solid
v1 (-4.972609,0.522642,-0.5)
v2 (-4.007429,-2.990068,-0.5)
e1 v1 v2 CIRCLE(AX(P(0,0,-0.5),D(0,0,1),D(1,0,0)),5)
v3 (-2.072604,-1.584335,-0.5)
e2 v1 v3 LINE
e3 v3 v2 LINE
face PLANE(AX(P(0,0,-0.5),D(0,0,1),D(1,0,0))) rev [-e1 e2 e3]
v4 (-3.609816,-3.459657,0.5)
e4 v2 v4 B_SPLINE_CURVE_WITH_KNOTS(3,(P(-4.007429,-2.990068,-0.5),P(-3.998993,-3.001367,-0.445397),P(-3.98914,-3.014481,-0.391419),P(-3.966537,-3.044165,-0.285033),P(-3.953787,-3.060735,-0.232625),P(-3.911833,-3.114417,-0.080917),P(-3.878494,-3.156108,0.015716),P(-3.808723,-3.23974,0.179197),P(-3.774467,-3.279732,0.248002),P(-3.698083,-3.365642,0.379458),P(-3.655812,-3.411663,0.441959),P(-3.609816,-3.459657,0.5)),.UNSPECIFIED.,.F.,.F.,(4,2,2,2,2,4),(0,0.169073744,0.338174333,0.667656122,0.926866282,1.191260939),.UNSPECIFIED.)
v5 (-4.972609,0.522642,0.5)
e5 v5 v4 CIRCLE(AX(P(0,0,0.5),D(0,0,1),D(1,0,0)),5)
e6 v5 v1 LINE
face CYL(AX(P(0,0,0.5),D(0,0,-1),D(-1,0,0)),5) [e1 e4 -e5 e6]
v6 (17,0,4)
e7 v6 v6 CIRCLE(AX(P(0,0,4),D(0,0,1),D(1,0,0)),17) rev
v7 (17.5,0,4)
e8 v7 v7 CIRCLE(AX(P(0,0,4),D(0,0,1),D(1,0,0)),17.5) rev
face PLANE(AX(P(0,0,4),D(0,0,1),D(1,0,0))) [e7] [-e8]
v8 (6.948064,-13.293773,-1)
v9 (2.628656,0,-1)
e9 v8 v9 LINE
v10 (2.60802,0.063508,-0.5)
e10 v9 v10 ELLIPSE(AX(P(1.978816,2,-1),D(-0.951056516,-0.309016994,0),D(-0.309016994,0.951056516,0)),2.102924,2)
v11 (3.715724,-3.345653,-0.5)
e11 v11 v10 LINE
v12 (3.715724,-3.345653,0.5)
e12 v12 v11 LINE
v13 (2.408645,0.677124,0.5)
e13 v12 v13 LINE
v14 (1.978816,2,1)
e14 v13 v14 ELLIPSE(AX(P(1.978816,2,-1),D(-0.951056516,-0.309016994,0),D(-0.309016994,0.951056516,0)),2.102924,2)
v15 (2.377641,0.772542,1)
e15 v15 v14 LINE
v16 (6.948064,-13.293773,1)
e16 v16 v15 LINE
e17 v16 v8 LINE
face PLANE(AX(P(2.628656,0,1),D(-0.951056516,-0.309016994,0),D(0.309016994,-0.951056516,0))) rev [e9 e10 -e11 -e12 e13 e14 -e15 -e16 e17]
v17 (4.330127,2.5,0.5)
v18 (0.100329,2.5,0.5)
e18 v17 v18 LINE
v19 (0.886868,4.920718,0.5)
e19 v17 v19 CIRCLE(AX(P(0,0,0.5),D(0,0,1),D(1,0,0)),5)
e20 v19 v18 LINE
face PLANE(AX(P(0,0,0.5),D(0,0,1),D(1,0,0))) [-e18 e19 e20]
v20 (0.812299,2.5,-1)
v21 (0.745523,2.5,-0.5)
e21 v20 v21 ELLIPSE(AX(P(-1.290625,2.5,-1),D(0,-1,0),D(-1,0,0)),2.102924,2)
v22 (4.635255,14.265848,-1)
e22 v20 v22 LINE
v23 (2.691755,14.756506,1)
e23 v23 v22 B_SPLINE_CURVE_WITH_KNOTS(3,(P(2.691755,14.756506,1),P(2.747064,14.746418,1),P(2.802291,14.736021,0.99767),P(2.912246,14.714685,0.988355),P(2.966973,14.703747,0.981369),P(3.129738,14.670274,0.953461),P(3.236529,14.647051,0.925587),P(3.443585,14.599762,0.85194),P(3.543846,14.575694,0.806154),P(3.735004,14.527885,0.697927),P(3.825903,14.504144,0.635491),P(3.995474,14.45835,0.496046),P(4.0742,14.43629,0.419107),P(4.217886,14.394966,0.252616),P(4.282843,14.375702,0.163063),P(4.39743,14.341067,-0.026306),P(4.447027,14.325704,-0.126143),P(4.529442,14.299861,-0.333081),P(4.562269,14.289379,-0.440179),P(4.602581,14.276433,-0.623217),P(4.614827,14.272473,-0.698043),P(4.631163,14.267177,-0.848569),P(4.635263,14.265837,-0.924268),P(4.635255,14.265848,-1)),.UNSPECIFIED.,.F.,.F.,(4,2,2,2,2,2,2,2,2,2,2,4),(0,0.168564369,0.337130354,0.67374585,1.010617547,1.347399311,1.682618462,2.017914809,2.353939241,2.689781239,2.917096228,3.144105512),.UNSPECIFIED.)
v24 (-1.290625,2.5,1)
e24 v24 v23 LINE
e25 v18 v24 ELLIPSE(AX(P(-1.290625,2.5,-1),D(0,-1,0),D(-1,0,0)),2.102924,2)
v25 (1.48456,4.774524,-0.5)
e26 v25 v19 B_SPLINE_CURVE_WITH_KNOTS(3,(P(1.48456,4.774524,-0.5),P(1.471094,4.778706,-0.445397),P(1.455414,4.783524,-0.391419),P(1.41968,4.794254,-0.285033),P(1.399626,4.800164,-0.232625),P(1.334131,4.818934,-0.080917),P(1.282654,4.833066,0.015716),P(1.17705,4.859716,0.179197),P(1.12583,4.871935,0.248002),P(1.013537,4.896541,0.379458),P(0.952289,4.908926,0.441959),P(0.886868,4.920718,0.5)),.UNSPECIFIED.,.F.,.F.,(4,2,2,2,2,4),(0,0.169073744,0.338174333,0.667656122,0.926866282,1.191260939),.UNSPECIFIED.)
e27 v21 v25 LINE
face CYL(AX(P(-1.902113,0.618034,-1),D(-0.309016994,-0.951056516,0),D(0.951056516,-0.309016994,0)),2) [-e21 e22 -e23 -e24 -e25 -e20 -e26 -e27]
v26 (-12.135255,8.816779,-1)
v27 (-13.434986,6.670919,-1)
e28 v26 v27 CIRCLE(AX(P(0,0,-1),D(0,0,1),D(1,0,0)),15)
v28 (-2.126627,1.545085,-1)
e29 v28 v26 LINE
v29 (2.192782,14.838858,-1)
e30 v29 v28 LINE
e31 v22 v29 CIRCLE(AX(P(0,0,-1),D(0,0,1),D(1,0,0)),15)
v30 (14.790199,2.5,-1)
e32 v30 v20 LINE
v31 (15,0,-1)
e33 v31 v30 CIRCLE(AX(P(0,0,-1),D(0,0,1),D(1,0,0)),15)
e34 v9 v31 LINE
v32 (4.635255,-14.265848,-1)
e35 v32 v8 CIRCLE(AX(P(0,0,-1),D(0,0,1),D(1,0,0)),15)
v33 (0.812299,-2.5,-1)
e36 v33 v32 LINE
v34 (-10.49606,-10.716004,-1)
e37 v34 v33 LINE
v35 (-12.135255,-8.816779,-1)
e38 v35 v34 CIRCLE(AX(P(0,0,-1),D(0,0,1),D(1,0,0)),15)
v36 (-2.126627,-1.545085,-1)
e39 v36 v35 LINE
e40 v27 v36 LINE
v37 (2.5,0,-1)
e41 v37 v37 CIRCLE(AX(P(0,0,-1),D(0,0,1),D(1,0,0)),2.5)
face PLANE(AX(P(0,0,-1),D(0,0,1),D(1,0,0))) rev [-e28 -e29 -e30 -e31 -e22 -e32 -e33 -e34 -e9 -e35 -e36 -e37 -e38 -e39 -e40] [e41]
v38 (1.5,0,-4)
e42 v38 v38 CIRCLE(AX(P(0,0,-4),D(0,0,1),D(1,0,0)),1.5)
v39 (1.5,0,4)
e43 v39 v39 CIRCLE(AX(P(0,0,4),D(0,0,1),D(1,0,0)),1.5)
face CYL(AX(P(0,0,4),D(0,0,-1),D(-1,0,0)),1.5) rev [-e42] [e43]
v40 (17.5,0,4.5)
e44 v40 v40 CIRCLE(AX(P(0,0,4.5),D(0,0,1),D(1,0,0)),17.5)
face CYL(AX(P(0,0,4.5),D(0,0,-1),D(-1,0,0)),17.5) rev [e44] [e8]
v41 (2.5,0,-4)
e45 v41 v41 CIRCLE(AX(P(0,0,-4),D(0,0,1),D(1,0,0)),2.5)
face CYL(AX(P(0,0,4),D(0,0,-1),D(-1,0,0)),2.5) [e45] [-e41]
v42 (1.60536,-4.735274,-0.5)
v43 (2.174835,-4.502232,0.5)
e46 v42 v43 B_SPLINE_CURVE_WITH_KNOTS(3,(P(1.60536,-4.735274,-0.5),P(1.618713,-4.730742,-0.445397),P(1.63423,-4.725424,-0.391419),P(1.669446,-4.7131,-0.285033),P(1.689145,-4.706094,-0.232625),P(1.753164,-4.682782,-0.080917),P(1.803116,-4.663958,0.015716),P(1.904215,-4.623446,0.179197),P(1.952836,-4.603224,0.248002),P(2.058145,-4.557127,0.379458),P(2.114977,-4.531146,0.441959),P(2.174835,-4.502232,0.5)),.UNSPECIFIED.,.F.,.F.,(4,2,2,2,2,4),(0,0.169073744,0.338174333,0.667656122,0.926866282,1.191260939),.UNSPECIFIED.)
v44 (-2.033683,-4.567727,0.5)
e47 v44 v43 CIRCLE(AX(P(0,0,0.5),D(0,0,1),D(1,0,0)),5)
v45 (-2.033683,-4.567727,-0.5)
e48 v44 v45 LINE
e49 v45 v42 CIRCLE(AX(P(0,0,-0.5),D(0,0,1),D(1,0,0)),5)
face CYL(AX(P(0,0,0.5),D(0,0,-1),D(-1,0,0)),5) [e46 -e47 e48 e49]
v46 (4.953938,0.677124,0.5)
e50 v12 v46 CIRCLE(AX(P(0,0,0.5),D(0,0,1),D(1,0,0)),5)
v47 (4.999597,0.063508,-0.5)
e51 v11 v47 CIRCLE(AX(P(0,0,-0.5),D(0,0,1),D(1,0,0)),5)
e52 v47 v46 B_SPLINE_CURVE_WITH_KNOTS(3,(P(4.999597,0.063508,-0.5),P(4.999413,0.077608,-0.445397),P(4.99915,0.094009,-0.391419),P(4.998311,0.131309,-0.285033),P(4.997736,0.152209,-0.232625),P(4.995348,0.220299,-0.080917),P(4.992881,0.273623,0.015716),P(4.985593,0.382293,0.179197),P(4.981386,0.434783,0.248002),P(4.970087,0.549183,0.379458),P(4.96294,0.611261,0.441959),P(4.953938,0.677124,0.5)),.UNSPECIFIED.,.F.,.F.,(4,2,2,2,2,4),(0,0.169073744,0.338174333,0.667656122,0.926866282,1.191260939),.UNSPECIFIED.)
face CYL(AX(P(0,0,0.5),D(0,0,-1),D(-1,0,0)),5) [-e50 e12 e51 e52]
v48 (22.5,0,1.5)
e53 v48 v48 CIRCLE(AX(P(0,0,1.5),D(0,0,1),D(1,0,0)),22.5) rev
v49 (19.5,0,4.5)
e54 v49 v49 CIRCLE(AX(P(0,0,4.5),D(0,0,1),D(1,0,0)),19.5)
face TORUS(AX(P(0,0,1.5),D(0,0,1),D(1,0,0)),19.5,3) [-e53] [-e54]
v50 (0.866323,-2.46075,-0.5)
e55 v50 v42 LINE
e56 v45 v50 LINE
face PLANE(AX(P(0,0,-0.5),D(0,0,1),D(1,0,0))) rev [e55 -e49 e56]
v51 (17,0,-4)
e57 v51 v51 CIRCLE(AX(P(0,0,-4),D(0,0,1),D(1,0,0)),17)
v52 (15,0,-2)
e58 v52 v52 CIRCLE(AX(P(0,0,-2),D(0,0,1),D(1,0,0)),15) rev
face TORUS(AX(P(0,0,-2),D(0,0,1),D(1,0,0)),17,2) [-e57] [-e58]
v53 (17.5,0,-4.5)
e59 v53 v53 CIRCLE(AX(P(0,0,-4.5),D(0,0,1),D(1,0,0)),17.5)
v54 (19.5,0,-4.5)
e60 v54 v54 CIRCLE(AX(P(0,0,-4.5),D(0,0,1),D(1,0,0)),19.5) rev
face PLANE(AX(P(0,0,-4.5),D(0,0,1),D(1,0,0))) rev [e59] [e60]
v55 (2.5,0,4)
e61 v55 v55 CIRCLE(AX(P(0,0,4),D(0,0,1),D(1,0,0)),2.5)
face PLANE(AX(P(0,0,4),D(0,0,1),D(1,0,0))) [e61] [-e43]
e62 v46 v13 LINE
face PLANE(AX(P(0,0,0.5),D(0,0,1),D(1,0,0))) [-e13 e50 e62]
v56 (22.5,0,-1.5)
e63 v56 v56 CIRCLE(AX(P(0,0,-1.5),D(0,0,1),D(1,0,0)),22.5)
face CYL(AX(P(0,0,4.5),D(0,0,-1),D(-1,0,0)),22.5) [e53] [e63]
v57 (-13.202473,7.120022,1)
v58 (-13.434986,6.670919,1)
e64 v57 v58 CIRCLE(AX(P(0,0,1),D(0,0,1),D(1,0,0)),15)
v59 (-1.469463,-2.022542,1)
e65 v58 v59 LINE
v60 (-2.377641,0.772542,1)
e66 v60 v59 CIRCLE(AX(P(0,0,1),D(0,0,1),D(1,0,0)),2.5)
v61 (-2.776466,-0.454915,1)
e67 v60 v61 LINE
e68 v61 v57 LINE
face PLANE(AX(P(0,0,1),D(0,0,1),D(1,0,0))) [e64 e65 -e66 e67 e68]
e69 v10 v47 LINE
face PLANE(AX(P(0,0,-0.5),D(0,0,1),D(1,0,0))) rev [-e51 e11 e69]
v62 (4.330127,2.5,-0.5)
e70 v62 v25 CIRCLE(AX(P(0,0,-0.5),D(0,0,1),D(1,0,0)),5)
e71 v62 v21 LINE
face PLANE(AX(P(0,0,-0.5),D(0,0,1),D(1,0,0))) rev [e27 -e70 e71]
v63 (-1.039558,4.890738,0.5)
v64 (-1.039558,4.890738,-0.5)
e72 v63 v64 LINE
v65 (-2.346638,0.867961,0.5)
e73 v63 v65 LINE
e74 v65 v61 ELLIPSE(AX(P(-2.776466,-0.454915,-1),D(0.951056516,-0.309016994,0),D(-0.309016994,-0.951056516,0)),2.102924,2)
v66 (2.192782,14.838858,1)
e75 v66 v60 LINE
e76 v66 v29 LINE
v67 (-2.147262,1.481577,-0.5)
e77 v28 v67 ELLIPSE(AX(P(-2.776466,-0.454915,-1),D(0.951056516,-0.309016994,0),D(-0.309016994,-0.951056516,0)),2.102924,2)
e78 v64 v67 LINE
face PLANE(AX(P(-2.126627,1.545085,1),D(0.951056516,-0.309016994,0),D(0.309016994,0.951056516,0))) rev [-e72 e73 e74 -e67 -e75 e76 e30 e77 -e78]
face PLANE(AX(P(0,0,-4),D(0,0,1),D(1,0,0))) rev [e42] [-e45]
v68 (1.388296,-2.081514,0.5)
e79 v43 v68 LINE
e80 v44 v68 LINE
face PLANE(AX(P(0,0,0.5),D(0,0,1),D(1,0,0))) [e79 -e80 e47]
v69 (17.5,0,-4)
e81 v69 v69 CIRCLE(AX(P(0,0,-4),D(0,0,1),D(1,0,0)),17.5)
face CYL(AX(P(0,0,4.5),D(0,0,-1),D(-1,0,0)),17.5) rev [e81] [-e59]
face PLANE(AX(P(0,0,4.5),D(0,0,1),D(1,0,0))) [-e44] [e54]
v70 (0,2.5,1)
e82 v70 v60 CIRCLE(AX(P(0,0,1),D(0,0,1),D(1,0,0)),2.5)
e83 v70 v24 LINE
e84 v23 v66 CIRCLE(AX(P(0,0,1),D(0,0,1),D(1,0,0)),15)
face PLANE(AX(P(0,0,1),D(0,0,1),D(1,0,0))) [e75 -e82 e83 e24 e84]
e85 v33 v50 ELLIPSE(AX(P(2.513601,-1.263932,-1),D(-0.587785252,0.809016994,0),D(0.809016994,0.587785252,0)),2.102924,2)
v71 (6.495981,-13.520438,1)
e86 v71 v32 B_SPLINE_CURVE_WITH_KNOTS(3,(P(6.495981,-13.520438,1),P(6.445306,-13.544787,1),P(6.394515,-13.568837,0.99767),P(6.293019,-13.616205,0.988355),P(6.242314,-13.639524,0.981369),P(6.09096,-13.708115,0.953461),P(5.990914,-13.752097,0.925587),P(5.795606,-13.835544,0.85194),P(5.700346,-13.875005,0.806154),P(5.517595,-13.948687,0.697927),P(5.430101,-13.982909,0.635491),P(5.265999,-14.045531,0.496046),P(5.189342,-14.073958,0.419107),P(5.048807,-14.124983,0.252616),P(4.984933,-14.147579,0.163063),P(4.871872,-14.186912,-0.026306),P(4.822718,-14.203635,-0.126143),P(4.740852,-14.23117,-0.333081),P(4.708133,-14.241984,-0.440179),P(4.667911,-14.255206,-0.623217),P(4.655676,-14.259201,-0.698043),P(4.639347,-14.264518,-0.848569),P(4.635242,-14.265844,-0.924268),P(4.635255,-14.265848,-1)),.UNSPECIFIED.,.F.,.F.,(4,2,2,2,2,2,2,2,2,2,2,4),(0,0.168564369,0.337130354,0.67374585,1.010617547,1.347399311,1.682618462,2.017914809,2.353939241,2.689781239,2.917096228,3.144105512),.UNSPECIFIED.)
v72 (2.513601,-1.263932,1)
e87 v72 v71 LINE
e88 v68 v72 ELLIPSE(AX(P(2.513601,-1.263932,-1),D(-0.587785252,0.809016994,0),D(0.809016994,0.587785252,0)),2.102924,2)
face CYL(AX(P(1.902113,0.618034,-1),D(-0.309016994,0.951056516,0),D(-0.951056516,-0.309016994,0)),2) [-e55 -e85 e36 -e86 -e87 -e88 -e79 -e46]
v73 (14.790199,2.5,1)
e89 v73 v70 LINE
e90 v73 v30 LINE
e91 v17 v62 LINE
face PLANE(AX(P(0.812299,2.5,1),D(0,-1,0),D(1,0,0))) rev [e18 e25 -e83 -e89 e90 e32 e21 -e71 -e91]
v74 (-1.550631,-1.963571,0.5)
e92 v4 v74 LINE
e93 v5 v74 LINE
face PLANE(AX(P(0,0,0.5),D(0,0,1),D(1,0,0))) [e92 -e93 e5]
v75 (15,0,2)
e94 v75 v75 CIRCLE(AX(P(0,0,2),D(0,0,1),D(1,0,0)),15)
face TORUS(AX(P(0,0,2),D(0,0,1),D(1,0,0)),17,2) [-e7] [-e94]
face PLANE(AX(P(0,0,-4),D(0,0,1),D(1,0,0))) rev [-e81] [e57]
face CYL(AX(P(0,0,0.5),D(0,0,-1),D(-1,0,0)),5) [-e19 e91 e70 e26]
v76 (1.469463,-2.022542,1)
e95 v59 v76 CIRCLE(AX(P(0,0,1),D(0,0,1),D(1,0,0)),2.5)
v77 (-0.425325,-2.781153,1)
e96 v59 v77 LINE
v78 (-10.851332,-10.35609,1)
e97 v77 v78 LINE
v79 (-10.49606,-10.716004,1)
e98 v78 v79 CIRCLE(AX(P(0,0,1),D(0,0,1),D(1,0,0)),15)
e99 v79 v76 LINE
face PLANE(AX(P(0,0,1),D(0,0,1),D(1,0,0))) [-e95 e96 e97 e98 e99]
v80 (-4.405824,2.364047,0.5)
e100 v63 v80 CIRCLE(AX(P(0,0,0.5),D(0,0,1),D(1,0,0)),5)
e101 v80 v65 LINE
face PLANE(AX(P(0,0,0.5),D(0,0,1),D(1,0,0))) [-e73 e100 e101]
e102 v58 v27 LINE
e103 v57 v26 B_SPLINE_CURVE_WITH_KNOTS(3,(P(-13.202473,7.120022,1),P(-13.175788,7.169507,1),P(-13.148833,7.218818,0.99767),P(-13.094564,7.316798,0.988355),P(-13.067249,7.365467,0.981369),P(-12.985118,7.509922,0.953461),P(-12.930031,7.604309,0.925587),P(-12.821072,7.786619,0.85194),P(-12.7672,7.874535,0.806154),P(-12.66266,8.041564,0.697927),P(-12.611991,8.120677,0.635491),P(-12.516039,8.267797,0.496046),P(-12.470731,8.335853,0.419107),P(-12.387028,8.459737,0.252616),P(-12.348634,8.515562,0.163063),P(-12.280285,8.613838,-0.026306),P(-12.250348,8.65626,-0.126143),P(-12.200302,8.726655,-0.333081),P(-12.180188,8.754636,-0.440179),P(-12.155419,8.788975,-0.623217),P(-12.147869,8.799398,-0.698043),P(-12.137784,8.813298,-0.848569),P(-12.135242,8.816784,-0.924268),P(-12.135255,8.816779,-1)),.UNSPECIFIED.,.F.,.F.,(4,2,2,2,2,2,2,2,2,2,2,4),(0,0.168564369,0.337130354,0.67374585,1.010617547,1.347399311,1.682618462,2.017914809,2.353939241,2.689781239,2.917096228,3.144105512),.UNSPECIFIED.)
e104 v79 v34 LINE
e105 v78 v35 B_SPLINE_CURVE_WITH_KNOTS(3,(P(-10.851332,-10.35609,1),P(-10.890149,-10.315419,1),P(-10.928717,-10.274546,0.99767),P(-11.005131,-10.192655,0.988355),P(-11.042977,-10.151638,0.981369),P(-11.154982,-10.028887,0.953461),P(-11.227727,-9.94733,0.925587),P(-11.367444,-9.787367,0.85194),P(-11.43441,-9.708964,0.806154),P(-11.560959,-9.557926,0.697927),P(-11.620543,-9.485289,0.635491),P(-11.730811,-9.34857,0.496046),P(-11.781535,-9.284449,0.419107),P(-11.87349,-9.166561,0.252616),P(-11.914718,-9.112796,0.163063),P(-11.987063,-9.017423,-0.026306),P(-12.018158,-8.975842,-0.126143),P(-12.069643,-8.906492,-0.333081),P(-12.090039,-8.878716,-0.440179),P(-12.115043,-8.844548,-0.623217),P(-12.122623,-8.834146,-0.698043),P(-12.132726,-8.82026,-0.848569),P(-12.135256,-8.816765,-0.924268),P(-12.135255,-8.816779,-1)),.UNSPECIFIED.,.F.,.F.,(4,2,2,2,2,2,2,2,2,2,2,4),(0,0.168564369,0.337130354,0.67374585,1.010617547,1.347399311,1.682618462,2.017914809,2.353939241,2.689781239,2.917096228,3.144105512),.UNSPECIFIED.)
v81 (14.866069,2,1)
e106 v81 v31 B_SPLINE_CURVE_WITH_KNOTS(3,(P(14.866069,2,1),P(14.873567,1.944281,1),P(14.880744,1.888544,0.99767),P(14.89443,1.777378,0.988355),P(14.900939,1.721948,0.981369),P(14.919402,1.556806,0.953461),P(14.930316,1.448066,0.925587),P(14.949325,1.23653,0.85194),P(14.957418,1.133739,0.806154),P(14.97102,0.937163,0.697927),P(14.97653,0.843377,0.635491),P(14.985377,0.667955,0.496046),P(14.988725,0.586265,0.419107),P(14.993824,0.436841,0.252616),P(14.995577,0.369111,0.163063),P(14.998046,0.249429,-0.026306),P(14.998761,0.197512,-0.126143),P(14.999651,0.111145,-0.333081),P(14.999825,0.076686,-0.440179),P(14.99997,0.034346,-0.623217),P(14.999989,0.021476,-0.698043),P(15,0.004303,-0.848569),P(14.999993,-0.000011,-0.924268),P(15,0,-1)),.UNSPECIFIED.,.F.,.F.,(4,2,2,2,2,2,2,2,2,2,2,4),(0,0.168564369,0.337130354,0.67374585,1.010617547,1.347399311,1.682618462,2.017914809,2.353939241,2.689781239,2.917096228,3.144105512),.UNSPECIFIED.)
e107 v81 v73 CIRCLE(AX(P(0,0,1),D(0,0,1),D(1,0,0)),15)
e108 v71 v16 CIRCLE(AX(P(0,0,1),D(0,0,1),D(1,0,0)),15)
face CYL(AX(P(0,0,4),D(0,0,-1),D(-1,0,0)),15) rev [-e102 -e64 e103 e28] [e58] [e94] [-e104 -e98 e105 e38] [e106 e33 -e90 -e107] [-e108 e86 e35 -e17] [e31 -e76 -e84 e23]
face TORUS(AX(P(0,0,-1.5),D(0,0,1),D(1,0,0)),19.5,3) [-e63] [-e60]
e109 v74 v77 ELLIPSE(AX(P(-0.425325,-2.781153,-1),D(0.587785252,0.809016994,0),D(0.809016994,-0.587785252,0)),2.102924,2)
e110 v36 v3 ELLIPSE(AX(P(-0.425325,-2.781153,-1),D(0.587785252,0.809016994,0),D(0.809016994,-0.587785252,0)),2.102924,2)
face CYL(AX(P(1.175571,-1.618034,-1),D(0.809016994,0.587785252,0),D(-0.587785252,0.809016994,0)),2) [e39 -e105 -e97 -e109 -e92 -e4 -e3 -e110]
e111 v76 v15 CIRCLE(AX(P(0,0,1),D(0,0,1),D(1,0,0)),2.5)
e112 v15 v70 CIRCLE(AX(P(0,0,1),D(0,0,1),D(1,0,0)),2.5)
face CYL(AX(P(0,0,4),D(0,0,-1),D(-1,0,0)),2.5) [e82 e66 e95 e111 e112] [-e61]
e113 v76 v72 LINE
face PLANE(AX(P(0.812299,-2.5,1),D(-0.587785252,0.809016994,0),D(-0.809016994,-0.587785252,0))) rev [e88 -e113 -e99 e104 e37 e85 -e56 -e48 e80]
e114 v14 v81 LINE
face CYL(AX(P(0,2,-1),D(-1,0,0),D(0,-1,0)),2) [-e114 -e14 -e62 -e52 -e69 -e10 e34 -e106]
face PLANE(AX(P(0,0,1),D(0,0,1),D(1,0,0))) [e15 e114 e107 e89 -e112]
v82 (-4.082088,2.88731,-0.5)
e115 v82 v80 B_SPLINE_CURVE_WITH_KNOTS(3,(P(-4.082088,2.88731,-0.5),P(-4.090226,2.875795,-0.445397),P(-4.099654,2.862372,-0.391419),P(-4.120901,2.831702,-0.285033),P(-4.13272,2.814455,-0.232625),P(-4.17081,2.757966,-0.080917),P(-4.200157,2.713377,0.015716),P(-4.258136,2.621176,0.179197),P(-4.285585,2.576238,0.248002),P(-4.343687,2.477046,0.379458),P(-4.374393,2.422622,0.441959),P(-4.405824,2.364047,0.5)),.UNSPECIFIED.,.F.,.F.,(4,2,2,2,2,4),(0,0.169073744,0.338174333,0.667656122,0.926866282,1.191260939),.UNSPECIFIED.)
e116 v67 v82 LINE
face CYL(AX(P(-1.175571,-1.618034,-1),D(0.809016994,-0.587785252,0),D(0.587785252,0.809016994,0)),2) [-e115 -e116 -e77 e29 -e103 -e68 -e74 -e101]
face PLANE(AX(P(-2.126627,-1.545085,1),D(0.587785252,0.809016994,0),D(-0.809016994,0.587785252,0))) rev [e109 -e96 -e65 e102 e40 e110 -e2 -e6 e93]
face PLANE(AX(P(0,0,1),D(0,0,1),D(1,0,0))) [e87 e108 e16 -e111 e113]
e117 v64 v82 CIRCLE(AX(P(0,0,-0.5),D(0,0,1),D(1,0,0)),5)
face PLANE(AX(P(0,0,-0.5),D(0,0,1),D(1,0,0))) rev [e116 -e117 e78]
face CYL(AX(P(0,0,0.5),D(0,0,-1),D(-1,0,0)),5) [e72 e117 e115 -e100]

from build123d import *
from build123d.topology import SkipClean

# Parameters (mm, degrees)
SKETCH2_R           = 2.5
SKETCH2_R_2         = 1.5
BOSS_EXTRUDE1_DEPTH = 4
SKETCH3_R           = 17.5
SKETCH3_R_2         = 15
BOSS_EXTRUDE2_DEPTH = 4
SKETCH4_R           = 2.5
BOSS_EXTRUDE3_DEPTH = 1
SKETCH5_R           = 5
SKETCH5_R_2         = 2.5
BOSS_EXTRUDE4_DEPTH = 0.5
FILLET1_R           = 2
FILLET2_R           = 2
SKETCH6_R           = 22.5
SKETCH6_R_2         = 17.5
BOSS_EXTRUDE5_DEPTH = 4.5
FILLET3_R           = 3


with BuildPart() as part:
    # Sketch2 → Boss-Extrude1 (new, symmetric)
    with BuildSketch(Plane.XY):
        Circle(SKETCH2_R)
        Circle(SKETCH2_R_2, mode=Mode.SUBTRACT)
    extrude(amount=BOSS_EXTRUDE1_DEPTH, both=True)



with BuildPart() as body_2:
    # Sketch3 → Boss-Extrude2 (new, symmetric)
    with BuildSketch(Plane.XY):
        Circle(SKETCH3_R)
        Circle(SKETCH3_R_2, mode=Mode.SUBTRACT)
    extrude(amount=BOSS_EXTRUDE2_DEPTH, both=True)


with BuildPart() as part_1:
    add(part.part)

    add(body_2.part)  # Boss-Extrude3 merges body 2
    # Sketch4 → Boss-Extrude3 (add, symmetric)
    with BuildSketch(Plane.XY):
        with BuildLine():
            Line((0.812299241, 2.5), (14.790199458, 2.5))
            ThreePointArc((14.790199458, 2.5), (14.947457842, 1.254393904), (15, 0))
            Line((15, 0), (2.628655561, 0))
            Line((2.628655561, 0), (6.948064273, -13.293773086))
            ThreePointArc((6.948064273, -13.293773086), (5.812017992, -13.828248148), (4.635254916, -14.265847744))
            Line((4.635254916, -14.265847744), (0.812299241, -2.5))
            Line((0.812299241, -2.5), (-10.496059581, -10.716003606))
            ThreePointArc((-10.496059581, -10.716003606), (-11.355433179, -9.800721265), (-12.135254916, -8.816778784))
            Line((-12.135254916, -8.816778784), (-2.126627021, -1.545084972))
            Line((-2.126627021, -1.545084972), (-13.434985842, 6.670918634))
            ThreePointArc((-13.434985842, 6.670918634), (-12.830061654, 7.771069293), (-12.135254916, 8.816778784))
            Line((-12.135254916, 8.816778784), (-2.126627021, 1.545084972))
            Line((-2.126627021, 1.545084972), (2.192781692, 14.838858058))
            ThreePointArc((2.192781692, 14.838858058), (3.426018999, 14.603506217), (4.635254916, 14.265847744))
            Line((4.635254916, 14.265847744), (0.812299241, 2.5))
        make_face()
        Circle(SKETCH4_R, mode=Mode.SUBTRACT)
    extrude(amount=BOSS_EXTRUDE3_DEPTH, both=True)

    # Sketch5 → Boss-Extrude4 (add, symmetric)
    with BuildSketch(Plane.XY):
        Circle(SKETCH5_R)
        Circle(SKETCH5_R_2, mode=Mode.SUBTRACT)
    extrude(amount=BOSS_EXTRUDE4_DEPTH, both=True)

    # Fillet1
    fillet1_edges = [part_1.edges().sort_by_distance(p)[0] for p in [
        (-15, 0, 4),
        (-15, 0, -4),
    ]]
    fillet(fillet1_edges, radius=FILLET1_R)

    # Fillet2
    # the kernel refuses this fillet: 2 mm, written as the material it takes off along each edge
    with BuildSketch(Plane(origin=(-16.180339887, -11.755705046, 1), x_dir=(0.5877852522924676, -0.8090169943749516, 0), z_dir=(0.8090169943749516, 0.5877852522924676, 0))) as fillet2_piece_1_section:
        with BuildLine():
            CenterArc((FILLET2_R, FILLET2_R), FILLET2_R, 180, 90)
            Line((0, FILLET2_R), (0, 0))
            Line((0, 0), (FILLET2_R, 0))
        make_face()
    fillet2_piece_1 = extrude(amount=22.371344439, mode=Mode.PRIVATE)
    fillet2_piece_1 = fillet2_piece_1 & Plane(origin=(0, 0, 0.789788575), x_dir=(1, 0, 0), z_dir=(0, 0, -1)) * Cylinder(15, 53, mode=Mode.PRIVATE)
    fillet2_piece_1 = split(fillet2_piece_1, bisect_by=Plane(origin=(-3.505962459, -0.542939116, 0.789788575), z_dir=(-0.5877852522924808, -0.809016994374942, 0)), keep=Keep.TOP, mode=Mode.PRIVATE)
    fillet2_piece_1 = split(fillet2_piece_1, bisect_by=Plane(origin=(-7.715238997, -6.336511241, 0.5), z_dir=(0, 0, 1)), keep=Keep.TOP, mode=Mode.PRIVATE)
    add(fillet2_piece_1, mode=Mode.SUBTRACT)
    with BuildSketch(Plane(origin=(-16.180339887, -11.755705046, 1), x_dir=(0.5877852522924676, -0.8090169943749516, 0), z_dir=(0.8090169943749516, 0.5877852522924676, 0))) as fillet2_piece_2_section:
        with BuildLine():
            CenterArc((FILLET2_R, FILLET2_R), FILLET2_R, 180, 90)
            Line((0, FILLET2_R), (0, 0))
            Line((0, 0), (FILLET2_R, 0))
        make_face()
    fillet2_piece_2 = extrude(amount=22.371344439, mode=Mode.PRIVATE)
    fillet2_piece_2 = fillet2_piece_2 & Plane(origin=(0, 0, 0.165607545), x_dir=(1, 0, 0), z_dir=(0, 0, -1)) * Cylinder(15, 53, mode=Mode.PRIVATE)
    fillet2_piece_2 = fillet2_piece_2 - Plane(origin=(0, 0, 0.165607545), x_dir=(1, 0, 0), z_dir=(0, 0, 1)) * Cylinder(5, 53, mode=Mode.PRIVATE)
    add(fillet2_piece_2, mode=Mode.SUBTRACT)
    with BuildSketch(Plane(origin=(-16.180339887, -11.755705046, 1), x_dir=(0.5877852522924676, -0.8090169943749516, 0), z_dir=(0.8090169943749516, 0.5877852522924676, 0))) as fillet2_piece_3_section:
        with BuildLine():
            CenterArc((FILLET2_R, FILLET2_R), FILLET2_R, 180, 90)
            Line((0, FILLET2_R), (0, 0))
            Line((0, 0), (FILLET2_R, 0))
        make_face()
    fillet2_piece_3 = extrude(amount=22.371344439, mode=Mode.PRIVATE)
    fillet2_piece_3 = split(fillet2_piece_3, bisect_by=Plane(origin=(-2.407624437, -1.340928399, -0.624492786), z_dir=(-0.5877852522924808, -0.809016994374942, 0)), keep=Keep.TOP, mode=Mode.PRIVATE)
    fillet2_piece_3 = split(fillet2_piece_3, bisect_by=Plane(origin=(-3.07214741, -2.255565805, -0.5), z_dir=(0, 0, -1)), keep=Keep.TOP, mode=Mode.PRIVATE)
    fillet2_piece_3 = fillet2_piece_3 & Plane(origin=(0, 0, -0.624492786), x_dir=(1, 0, 0), z_dir=(0, 0, 1)) * Cylinder(5, 53, mode=Mode.PRIVATE)
    add(fillet2_piece_3, mode=Mode.SUBTRACT)
    with BuildSketch(Plane(origin=(-16.180339887, -11.755705046, 1), x_dir=(0.5877852522924676, -0.8090169943749516, 0), z_dir=(0.8090169943749516, 0.5877852522924676, 0))) as fillet2_piece_4_section:
        with BuildLine():
            CenterArc((FILLET2_R, FILLET2_R), FILLET2_R, 180, 90)
            Line((0, FILLET2_R), (0, 0))
            Line((0, 0), (FILLET2_R, 0))
        make_face()
    fillet2_piece_4 = extrude(amount=22.371344439, mode=Mode.PRIVATE)
    fillet2_piece_4 = split(fillet2_piece_4, bisect_by=Plane(origin=(2.517761199, 0.34129775, 0.915192328), z_dir=(0.9510565162951545, 0.3090169943749446, 0)), keep=Keep.TOP, mode=Mode.PRIVATE)
    add(fillet2_piece_4, mode=Mode.SUBTRACT)
    with BuildSketch(Plane(origin=(6.180339887, -19.021130326, 1), x_dir=(0.9510565162951548, 0.30901699437494423, 0), z_dir=(-0.3090169943749442, 0.9510565162951546, 0))) as fillet2_piece_5_section:
        with BuildLine():
            CenterArc((FILLET2_R, FILLET2_R), FILLET2_R, 180, 90)
            Line((0, FILLET2_R), (0, 0))
            Line((0, 0), (FILLET2_R, 0))
        make_face()
    fillet2_piece_5 = extrude(amount=22.371344439, mode=Mode.PRIVATE)
    fillet2_piece_5 = fillet2_piece_5 & Plane(origin=(0, 0, 0.789788575), x_dir=(1, 0, 0), z_dir=(0, 0, -1)) * Cylinder(15, 53, mode=Mode.PRIVATE)
    fillet2_piece_5 = split(fillet2_piece_5, bisect_by=Plane(origin=(-0.567036197, -3.502145856, 0.789788575), z_dir=(0.5877852522924683, -0.809016994374951, 0)), keep=Keep.TOP, mode=Mode.PRIVATE)
    fillet2_piece_5 = split(fillet2_piece_5, bisect_by=Plane(origin=(3.64224034, -9.29571798, 0.5), z_dir=(0, 0, 1)), keep=Keep.TOP, mode=Mode.PRIVATE)
    add(fillet2_piece_5, mode=Mode.SUBTRACT)
    with BuildSketch(Plane(origin=(6.180339887, -19.021130326, 1), x_dir=(0.9510565162951548, 0.30901699437494423, 0), z_dir=(-0.3090169943749442, 0.9510565162951546, 0))) as fillet2_piece_6_section:
        with BuildLine():
            CenterArc((FILLET2_R, FILLET2_R), FILLET2_R, 180, 90)
            Line((0, FILLET2_R), (0, 0))
            Line((0, 0), (FILLET2_R, 0))
        make_face()
    fillet2_piece_6 = extrude(amount=22.371344439, mode=Mode.PRIVATE)
    fillet2_piece_6 = fillet2_piece_6 & Plane(origin=(0, 0, 0.165607542), x_dir=(1, 0, 0), z_dir=(0, 0, -1)) * Cylinder(15, 53, mode=Mode.PRIVATE)
    fillet2_piece_6 = fillet2_piece_6 - Plane(origin=(0, 0, 0.165607542), x_dir=(1, 0, 0), z_dir=(0, 0, 1)) * Cylinder(5, 53, mode=Mode.PRIVATE)
    add(fillet2_piece_6, mode=Mode.SUBTRACT)
    with BuildSketch(Plane(origin=(6.180339887, -19.021130326, 1), x_dir=(0.9510565162951548, 0.30901699437494423, 0), z_dir=(-0.3090169943749442, 0.9510565162951546, 0))) as fillet2_piece_7_section:
        with BuildLine():
            CenterArc((FILLET2_R, FILLET2_R), FILLET2_R, 180, 90)
            Line((0, FILLET2_R), (0, 0))
            Line((0, 0), (FILLET2_R, 0))
        make_face()
    fillet2_piece_7 = extrude(amount=22.371344439, mode=Mode.PRIVATE)
    fillet2_piece_7 = split(fillet2_piece_7, bisect_by=Plane(origin=(0.531301828, -2.704156571, -0.624492787), z_dir=(0.5877852522924683, -0.809016994374951, 0)), keep=Keep.TOP, mode=Mode.PRIVATE)
    fillet2_piece_7 = split(fillet2_piece_7, bisect_by=Plane(origin=(1.195824797, -3.618793972, -0.5), z_dir=(0, 0, -1)), keep=Keep.TOP, mode=Mode.PRIVATE)
    fillet2_piece_7 = fillet2_piece_7 & Plane(origin=(0, 0, -0.624492787), x_dir=(1, 0, 0), z_dir=(0, 0, 1)) * Cylinder(5, 53, mode=Mode.PRIVATE)
    add(fillet2_piece_7, mode=Mode.SUBTRACT)
    with BuildSketch(Plane(origin=(6.180339887, -19.021130326, 1), x_dir=(0.9510565162951548, 0.30901699437494423, 0), z_dir=(-0.3090169943749442, 0.9510565162951546, 0))) as fillet2_piece_8_section:
        with BuildLine():
            CenterArc((FILLET2_R, FILLET2_R), FILLET2_R, 180, 90)
            Line((0, FILLET2_R), (0, 0))
            Line((0, 0), (FILLET2_R, 0))
        make_face()
    fillet2_piece_8 = extrude(amount=22.371344439, mode=Mode.PRIVATE)
    fillet2_piece_8 = split(fillet2_piece_8, bisect_by=Plane(origin=(0.453437549, 2.5, 0.915192328), z_dir=(0, 1, 0)), keep=Keep.TOP, mode=Mode.PRIVATE)
    add(fillet2_piece_8, mode=Mode.SUBTRACT)
    with BuildSketch(Plane(origin=(20, 0, 1), x_dir=(0, 1, 0), z_dir=(-1, 0, 0))) as fillet2_piece_9_section:
        with BuildLine():
            CenterArc((FILLET2_R, FILLET2_R), FILLET2_R, 180, 90)
            Line((0, FILLET2_R), (0, 0))
            Line((0, 0), (FILLET2_R, 0))
        make_face()
    fillet2_piece_9 = extrude(amount=22.371344439, mode=Mode.PRIVATE)
    fillet2_piece_9 = fillet2_piece_9 & Plane(origin=(0, 0, 0.789788574), x_dir=(1, 0, 0), z_dir=(0, 0, -1)) * Cylinder(15, 53, mode=Mode.PRIVATE)
    fillet2_piece_9 = split(fillet2_piece_9, bisect_by=Plane(origin=(3.155514809, -1.621506036, 0.789788574), z_dir=(0.9510565162951545, 0.3090169943749446, 0)), keep=Keep.TOP, mode=Mode.PRIVATE)
    fillet2_piece_9 = split(fillet2_piece_9, bisect_by=Plane(origin=(9.966267249, 0.591441577, 0.5), z_dir=(0, 0, 1)), keep=Keep.TOP, mode=Mode.PRIVATE)
    add(fillet2_piece_9, mode=Mode.SUBTRACT)
    with BuildSketch(Plane(origin=(20, 0, 1), x_dir=(0, 1, 0), z_dir=(-1, 0, 0))) as fillet2_piece_10_section:
        with BuildLine():
            CenterArc((FILLET2_R, FILLET2_R), FILLET2_R, 180, 90)
            Line((0, FILLET2_R), (0, 0))
            Line((0, 0), (FILLET2_R, 0))
        make_face()
    fillet2_piece_10 = extrude(amount=22.371344439, mode=Mode.PRIVATE)
    fillet2_piece_10 = fillet2_piece_10 & Plane(origin=(0, 0, 0.165607617), x_dir=(1, 0, 0), z_dir=(0, 0, -1)) * Cylinder(15, 53, mode=Mode.PRIVATE)
    fillet2_piece_10 = fillet2_piece_10 - Plane(origin=(0, 0, 0.165607617), x_dir=(1, 0, 0), z_dir=(0, 0, 1)) * Cylinder(5, 53, mode=Mode.PRIVATE)
    add(fillet2_piece_10, mode=Mode.SUBTRACT)
    with BuildSketch(Plane(origin=(20, 0, 1), x_dir=(0, 1, 0), z_dir=(-1, 0, 0))) as fillet2_piece_11_section:
        with BuildLine():
            CenterArc((FILLET2_R, FILLET2_R), FILLET2_R, 180, 90)
            Line((0, FILLET2_R), (0, 0))
            Line((0, 0), (FILLET2_R, 0))
        make_face()
    fillet2_piece_11 = extrude(amount=22.371344439, mode=Mode.PRIVATE)
    fillet2_piece_11 = split(fillet2_piece_11, bisect_by=Plane(origin=(2.735987023, -0.330332276, -0.624492792), z_dir=(0.9510565162951545, 0.3090169943749446, 0)), keep=Keep.TOP, mode=Mode.PRIVATE)
    fillet2_piece_11 = fillet2_piece_11 & Plane(origin=(0, 0, -0.624492792), x_dir=(1, 0, 0), z_dir=(0, 0, 1)) * Cylinder(5, 53, mode=Mode.PRIVATE)
    fillet2_piece_11 = split(fillet2_piece_11, bisect_by=Plane(origin=(3.811207779, 0.019028125, -0.5), z_dir=(0, 0, -1)), keep=Keep.TOP, mode=Mode.PRIVATE)
    add(fillet2_piece_11, mode=Mode.SUBTRACT)
    with BuildSketch(Plane(origin=(20, 0, 1), x_dir=(0, 1, 0), z_dir=(-1, 0, 0))) as fillet2_piece_12_section:
        with BuildLine():
            CenterArc((FILLET2_R, FILLET2_R), FILLET2_R, 180, 90)
            Line((0, FILLET2_R), (0, 0))
            Line((0, 0), (FILLET2_R, 0))
        make_face()
    fillet2_piece_12 = extrude(amount=22.371344439, mode=Mode.PRIVATE)
    fillet2_piece_12 = split(fillet2_piece_12, bisect_by=Plane(origin=(-2.237521382, 1.203787222, 0.915192328), z_dir=(-0.95105651629515, 0.30901699437495883, 0)), keep=Keep.TOP, mode=Mode.PRIVATE)
    add(fillet2_piece_12, mode=Mode.SUBTRACT)
    with BuildSketch(Plane(origin=(6.180339887, 19.021130326, 1), x_dir=(-0.9510565162951493, 0.3090169943749605, 0), z_dir=(-0.3090169943749605, -0.9510565162951493, 0))) as fillet2_piece_13_section:
        with BuildLine():
            CenterArc((FILLET2_R, FILLET2_R), FILLET2_R, 180, 90)
            Line((0, FILLET2_R), (0, 0))
            Line((0, 0), (FILLET2_R, 0))
        make_face()
    fillet2_piece_13 = extrude(amount=22.371344439, mode=Mode.PRIVATE)
    fillet2_piece_13 = fillet2_piece_13 & Plane(origin=(0, 0, 0.789788575), x_dir=(1, 0, 0), z_dir=(0, 0, -1)) * Cylinder(15, 53, mode=Mode.PRIVATE)
    fillet2_piece_13 = split(fillet2_piece_13, bisect_by=Plane(origin=(2.517251606, 2.5, 0.789788575), z_dir=(0, 1, 0)), keep=Keep.TOP, mode=Mode.PRIVATE)
    fillet2_piece_13 = split(fillet2_piece_13, bisect_by=Plane(origin=(2.517251606, 9.661248979, 0.5), z_dir=(0, 0, 1)), keep=Keep.TOP, mode=Mode.PRIVATE)
    add(fillet2_piece_13, mode=Mode.SUBTRACT)
    with BuildSketch(Plane(origin=(6.180339887, 19.021130326, 1), x_dir=(-0.9510565162951493, 0.3090169943749605, 0), z_dir=(-0.3090169943749605, -0.9510565162951493, 0))) as fillet2_piece_14_section:
        with BuildLine():
            CenterArc((FILLET2_R, FILLET2_R), FILLET2_R, 180, 90)
            Line((0, FILLET2_R), (0, 0))
            Line((0, 0), (FILLET2_R, 0))
        make_face()
    fillet2_piece_14 = extrude(amount=22.371344439, mode=Mode.PRIVATE)
    fillet2_piece_14 = fillet2_piece_14 & Plane(origin=(0, 0, 0.165607543), x_dir=(1, 0, 0), z_dir=(0, 0, -1)) * Cylinder(15, 53, mode=Mode.PRIVATE)
    fillet2_piece_14 = fillet2_piece_14 - Plane(origin=(0, 0, 0.165607543), x_dir=(1, 0, 0), z_dir=(0, 0, 1)) * Cylinder(5, 53, mode=Mode.PRIVATE)
    add(fillet2_piece_14, mode=Mode.SUBTRACT)
    with BuildSketch(Plane(origin=(6.180339887, 19.021130326, 1), x_dir=(-0.9510565162951493, 0.3090169943749605, 0), z_dir=(-0.3090169943749605, -0.9510565162951493, 0))) as fillet2_piece_15_section:
        with BuildLine():
            CenterArc((FILLET2_R, FILLET2_R), FILLET2_R, 180, 90)
            Line((0, FILLET2_R), (0, 0))
            Line((0, 0), (FILLET2_R, 0))
        make_face()
    fillet2_piece_15 = extrude(amount=22.371344439, mode=Mode.PRIVATE)
    fillet2_piece_15 = split(fillet2_piece_15, bisect_by=Plane(origin=(1.159631148, 2.5, -0.624492787), z_dir=(0, 1, 0)), keep=Keep.TOP, mode=Mode.PRIVATE)
    fillet2_piece_15 = split(fillet2_piece_15, bisect_by=Plane(origin=(1.159631148, 3.630554003, -0.5), z_dir=(0, 0, -1)), keep=Keep.TOP, mode=Mode.PRIVATE)
    fillet2_piece_15 = fillet2_piece_15 & Plane(origin=(0, 0, -0.624492787), x_dir=(1, 0, 0), z_dir=(0, 0, 1)) * Cylinder(5, 53, mode=Mode.PRIVATE)
    add(fillet2_piece_15, mode=Mode.SUBTRACT)
    with BuildSketch(Plane(origin=(6.180339887, 19.021130326, 1), x_dir=(-0.9510565162951493, 0.3090169943749605, 0), z_dir=(-0.3090169943749605, -0.9510565162951493, 0))) as fillet2_piece_16_section:
        with BuildLine():
            CenterArc((FILLET2_R, FILLET2_R), FILLET2_R, 180, 90)
            Line((0, FILLET2_R), (0, 0))
            Line((0, 0), (FILLET2_R, 0))
        make_face()
    fillet2_piece_16 = extrude(amount=22.371344439, mode=Mode.PRIVATE)
    fillet2_piece_16 = split(fillet2_piece_16, bisect_by=Plane(origin=(-1.836301814, -1.756018582, 0.915192328), z_dir=(-0.5877852522924808, -0.809016994374942, 0)), keep=Keep.TOP, mode=Mode.PRIVATE)
    add(fillet2_piece_16, mode=Mode.SUBTRACT)
    with BuildSketch(Plane(origin=(-16.180339887, 11.755705046, 1), x_dir=(-0.5877852522924818, -0.8090169943749412, 0), z_dir=(0.8090169943749412, -0.5877852522924817, 0))) as fillet2_piece_17_section:
        with BuildLine():
            CenterArc((FILLET2_R, FILLET2_R), FILLET2_R, 180, 90)
            Line((0, FILLET2_R), (0, 0))
            Line((0, 0), (FILLET2_R, 0))
        make_face()
    fillet2_piece_17 = extrude(amount=22.371344439, mode=Mode.PRIVATE)
    fillet2_piece_17 = fillet2_piece_17 & Plane(origin=(0, 0, 0.789788575), x_dir=(1, 0, 0), z_dir=(0, 0, -1)) * Cylinder(15, 53, mode=Mode.PRIVATE)
    fillet2_piece_17 = split(fillet2_piece_17, bisect_by=Plane(origin=(-1.599767765, 3.166591029, 0.789788575), z_dir=(-0.95105651629515, 0.30901699437495883, 0)), keep=Keep.TOP, mode=Mode.PRIVATE)
    fillet2_piece_17 = split(fillet2_piece_17, bisect_by=Plane(origin=(-8.410520272, 5.379538664, 0.5), z_dir=(0, 0, 1)), keep=Keep.TOP, mode=Mode.PRIVATE)
    add(fillet2_piece_17, mode=Mode.SUBTRACT)
    with BuildSketch(Plane(origin=(-16.180339887, 11.755705046, 1), x_dir=(-0.5877852522924818, -0.8090169943749412, 0), z_dir=(0.8090169943749412, -0.5877852522924817, 0))) as fillet2_piece_18_section:
        with BuildLine():
            CenterArc((FILLET2_R, FILLET2_R), FILLET2_R, 180, 90)
            Line((0, FILLET2_R), (0, 0))
            Line((0, 0), (FILLET2_R, 0))
        make_face()
    fillet2_piece_18 = extrude(amount=22.371344439, mode=Mode.PRIVATE)
    fillet2_piece_18 = fillet2_piece_18 & Plane(origin=(0, 0, 0.165607546), x_dir=(1, 0, 0), z_dir=(0, 0, -1)) * Cylinder(15, 53, mode=Mode.PRIVATE)
    fillet2_piece_18 = fillet2_piece_18 - Plane(origin=(0, 0, 0.165607546), x_dir=(1, 0, 0), z_dir=(0, 0, 1)) * Cylinder(5, 53, mode=Mode.PRIVATE)
    add(fillet2_piece_18, mode=Mode.SUBTRACT)
    with BuildSketch(Plane(origin=(-16.180339887, 11.755705046, 1), x_dir=(-0.5877852522924818, -0.8090169943749412, 0), z_dir=(0.8090169943749412, -0.5877852522924817, 0))) as fillet2_piece_19_section:
        with BuildLine():
            CenterArc((FILLET2_R, FILLET2_R), FILLET2_R, 180, 90)
            Line((0, FILLET2_R), (0, 0))
            Line((0, 0), (FILLET2_R, 0))
        make_face()
    fillet2_piece_19 = extrude(amount=22.371344439, mode=Mode.PRIVATE)
    fillet2_piece_19 = split(fillet2_piece_19, bisect_by=Plane(origin=(-2.019295559, 1.875417246, -0.624492786), z_dir=(-0.95105651629515, 0.30901699437495883, 0)), keep=Keep.TOP, mode=Mode.PRIVATE)
    fillet2_piece_19 = split(fillet2_piece_19, bisect_by=Plane(origin=(-3.094516315, 2.224777647, -0.5), z_dir=(0, 0, -1)), keep=Keep.TOP, mode=Mode.PRIVATE)
    fillet2_piece_19 = fillet2_piece_19 & Plane(origin=(0, 0, -0.624492786), x_dir=(1, 0, 0), z_dir=(0, 0, 1)) * Cylinder(5, 53, mode=Mode.PRIVATE)
    add(fillet2_piece_19, mode=Mode.SUBTRACT)
    with BuildSketch(Plane(origin=(-16.180339887, 11.755705046, 1), x_dir=(-0.5877852522924818, -0.8090169943749412, 0), z_dir=(0.8090169943749412, -0.5877852522924817, 0))) as fillet2_piece_20_section:
        with BuildLine():
            CenterArc((FILLET2_R, FILLET2_R), FILLET2_R, 180, 90)
            Line((0, FILLET2_R), (0, 0))
            Line((0, 0), (FILLET2_R, 0))
        make_face()
    fillet2_piece_20 = extrude(amount=22.371344439, mode=Mode.PRIVATE)
    fillet2_piece_20 = split(fillet2_piece_20, bisect_by=Plane(origin=(1.102624448, -2.28906639, 0.915192328), z_dir=(0.5877852522924683, -0.809016994374951, 0)), keep=Keep.TOP, mode=Mode.PRIVATE)
    add(fillet2_piece_20, mode=Mode.SUBTRACT)

    # Sketch6 → Boss-Extrude5 (add, symmetric)
    with SkipClean():  # the faces are left unmerged after this step: merging them gives an invalid solid
        with BuildSketch(Plane.XY):
            Circle(SKETCH6_R)
            Circle(SKETCH6_R_2, mode=Mode.SUBTRACT)
        extrude(amount=BOSS_EXTRUDE5_DEPTH, both=True)

    # Fillet3
    fillet3_edges = [part_1.edges().sort_by_distance(p)[0] for p in [
        (-22.5, 0, 4.5),
        (-22.5, 0, -4.5),
    ]]
    fillet(fillet3_edges, radius=FILLET3_R)


solid = part_1.part
